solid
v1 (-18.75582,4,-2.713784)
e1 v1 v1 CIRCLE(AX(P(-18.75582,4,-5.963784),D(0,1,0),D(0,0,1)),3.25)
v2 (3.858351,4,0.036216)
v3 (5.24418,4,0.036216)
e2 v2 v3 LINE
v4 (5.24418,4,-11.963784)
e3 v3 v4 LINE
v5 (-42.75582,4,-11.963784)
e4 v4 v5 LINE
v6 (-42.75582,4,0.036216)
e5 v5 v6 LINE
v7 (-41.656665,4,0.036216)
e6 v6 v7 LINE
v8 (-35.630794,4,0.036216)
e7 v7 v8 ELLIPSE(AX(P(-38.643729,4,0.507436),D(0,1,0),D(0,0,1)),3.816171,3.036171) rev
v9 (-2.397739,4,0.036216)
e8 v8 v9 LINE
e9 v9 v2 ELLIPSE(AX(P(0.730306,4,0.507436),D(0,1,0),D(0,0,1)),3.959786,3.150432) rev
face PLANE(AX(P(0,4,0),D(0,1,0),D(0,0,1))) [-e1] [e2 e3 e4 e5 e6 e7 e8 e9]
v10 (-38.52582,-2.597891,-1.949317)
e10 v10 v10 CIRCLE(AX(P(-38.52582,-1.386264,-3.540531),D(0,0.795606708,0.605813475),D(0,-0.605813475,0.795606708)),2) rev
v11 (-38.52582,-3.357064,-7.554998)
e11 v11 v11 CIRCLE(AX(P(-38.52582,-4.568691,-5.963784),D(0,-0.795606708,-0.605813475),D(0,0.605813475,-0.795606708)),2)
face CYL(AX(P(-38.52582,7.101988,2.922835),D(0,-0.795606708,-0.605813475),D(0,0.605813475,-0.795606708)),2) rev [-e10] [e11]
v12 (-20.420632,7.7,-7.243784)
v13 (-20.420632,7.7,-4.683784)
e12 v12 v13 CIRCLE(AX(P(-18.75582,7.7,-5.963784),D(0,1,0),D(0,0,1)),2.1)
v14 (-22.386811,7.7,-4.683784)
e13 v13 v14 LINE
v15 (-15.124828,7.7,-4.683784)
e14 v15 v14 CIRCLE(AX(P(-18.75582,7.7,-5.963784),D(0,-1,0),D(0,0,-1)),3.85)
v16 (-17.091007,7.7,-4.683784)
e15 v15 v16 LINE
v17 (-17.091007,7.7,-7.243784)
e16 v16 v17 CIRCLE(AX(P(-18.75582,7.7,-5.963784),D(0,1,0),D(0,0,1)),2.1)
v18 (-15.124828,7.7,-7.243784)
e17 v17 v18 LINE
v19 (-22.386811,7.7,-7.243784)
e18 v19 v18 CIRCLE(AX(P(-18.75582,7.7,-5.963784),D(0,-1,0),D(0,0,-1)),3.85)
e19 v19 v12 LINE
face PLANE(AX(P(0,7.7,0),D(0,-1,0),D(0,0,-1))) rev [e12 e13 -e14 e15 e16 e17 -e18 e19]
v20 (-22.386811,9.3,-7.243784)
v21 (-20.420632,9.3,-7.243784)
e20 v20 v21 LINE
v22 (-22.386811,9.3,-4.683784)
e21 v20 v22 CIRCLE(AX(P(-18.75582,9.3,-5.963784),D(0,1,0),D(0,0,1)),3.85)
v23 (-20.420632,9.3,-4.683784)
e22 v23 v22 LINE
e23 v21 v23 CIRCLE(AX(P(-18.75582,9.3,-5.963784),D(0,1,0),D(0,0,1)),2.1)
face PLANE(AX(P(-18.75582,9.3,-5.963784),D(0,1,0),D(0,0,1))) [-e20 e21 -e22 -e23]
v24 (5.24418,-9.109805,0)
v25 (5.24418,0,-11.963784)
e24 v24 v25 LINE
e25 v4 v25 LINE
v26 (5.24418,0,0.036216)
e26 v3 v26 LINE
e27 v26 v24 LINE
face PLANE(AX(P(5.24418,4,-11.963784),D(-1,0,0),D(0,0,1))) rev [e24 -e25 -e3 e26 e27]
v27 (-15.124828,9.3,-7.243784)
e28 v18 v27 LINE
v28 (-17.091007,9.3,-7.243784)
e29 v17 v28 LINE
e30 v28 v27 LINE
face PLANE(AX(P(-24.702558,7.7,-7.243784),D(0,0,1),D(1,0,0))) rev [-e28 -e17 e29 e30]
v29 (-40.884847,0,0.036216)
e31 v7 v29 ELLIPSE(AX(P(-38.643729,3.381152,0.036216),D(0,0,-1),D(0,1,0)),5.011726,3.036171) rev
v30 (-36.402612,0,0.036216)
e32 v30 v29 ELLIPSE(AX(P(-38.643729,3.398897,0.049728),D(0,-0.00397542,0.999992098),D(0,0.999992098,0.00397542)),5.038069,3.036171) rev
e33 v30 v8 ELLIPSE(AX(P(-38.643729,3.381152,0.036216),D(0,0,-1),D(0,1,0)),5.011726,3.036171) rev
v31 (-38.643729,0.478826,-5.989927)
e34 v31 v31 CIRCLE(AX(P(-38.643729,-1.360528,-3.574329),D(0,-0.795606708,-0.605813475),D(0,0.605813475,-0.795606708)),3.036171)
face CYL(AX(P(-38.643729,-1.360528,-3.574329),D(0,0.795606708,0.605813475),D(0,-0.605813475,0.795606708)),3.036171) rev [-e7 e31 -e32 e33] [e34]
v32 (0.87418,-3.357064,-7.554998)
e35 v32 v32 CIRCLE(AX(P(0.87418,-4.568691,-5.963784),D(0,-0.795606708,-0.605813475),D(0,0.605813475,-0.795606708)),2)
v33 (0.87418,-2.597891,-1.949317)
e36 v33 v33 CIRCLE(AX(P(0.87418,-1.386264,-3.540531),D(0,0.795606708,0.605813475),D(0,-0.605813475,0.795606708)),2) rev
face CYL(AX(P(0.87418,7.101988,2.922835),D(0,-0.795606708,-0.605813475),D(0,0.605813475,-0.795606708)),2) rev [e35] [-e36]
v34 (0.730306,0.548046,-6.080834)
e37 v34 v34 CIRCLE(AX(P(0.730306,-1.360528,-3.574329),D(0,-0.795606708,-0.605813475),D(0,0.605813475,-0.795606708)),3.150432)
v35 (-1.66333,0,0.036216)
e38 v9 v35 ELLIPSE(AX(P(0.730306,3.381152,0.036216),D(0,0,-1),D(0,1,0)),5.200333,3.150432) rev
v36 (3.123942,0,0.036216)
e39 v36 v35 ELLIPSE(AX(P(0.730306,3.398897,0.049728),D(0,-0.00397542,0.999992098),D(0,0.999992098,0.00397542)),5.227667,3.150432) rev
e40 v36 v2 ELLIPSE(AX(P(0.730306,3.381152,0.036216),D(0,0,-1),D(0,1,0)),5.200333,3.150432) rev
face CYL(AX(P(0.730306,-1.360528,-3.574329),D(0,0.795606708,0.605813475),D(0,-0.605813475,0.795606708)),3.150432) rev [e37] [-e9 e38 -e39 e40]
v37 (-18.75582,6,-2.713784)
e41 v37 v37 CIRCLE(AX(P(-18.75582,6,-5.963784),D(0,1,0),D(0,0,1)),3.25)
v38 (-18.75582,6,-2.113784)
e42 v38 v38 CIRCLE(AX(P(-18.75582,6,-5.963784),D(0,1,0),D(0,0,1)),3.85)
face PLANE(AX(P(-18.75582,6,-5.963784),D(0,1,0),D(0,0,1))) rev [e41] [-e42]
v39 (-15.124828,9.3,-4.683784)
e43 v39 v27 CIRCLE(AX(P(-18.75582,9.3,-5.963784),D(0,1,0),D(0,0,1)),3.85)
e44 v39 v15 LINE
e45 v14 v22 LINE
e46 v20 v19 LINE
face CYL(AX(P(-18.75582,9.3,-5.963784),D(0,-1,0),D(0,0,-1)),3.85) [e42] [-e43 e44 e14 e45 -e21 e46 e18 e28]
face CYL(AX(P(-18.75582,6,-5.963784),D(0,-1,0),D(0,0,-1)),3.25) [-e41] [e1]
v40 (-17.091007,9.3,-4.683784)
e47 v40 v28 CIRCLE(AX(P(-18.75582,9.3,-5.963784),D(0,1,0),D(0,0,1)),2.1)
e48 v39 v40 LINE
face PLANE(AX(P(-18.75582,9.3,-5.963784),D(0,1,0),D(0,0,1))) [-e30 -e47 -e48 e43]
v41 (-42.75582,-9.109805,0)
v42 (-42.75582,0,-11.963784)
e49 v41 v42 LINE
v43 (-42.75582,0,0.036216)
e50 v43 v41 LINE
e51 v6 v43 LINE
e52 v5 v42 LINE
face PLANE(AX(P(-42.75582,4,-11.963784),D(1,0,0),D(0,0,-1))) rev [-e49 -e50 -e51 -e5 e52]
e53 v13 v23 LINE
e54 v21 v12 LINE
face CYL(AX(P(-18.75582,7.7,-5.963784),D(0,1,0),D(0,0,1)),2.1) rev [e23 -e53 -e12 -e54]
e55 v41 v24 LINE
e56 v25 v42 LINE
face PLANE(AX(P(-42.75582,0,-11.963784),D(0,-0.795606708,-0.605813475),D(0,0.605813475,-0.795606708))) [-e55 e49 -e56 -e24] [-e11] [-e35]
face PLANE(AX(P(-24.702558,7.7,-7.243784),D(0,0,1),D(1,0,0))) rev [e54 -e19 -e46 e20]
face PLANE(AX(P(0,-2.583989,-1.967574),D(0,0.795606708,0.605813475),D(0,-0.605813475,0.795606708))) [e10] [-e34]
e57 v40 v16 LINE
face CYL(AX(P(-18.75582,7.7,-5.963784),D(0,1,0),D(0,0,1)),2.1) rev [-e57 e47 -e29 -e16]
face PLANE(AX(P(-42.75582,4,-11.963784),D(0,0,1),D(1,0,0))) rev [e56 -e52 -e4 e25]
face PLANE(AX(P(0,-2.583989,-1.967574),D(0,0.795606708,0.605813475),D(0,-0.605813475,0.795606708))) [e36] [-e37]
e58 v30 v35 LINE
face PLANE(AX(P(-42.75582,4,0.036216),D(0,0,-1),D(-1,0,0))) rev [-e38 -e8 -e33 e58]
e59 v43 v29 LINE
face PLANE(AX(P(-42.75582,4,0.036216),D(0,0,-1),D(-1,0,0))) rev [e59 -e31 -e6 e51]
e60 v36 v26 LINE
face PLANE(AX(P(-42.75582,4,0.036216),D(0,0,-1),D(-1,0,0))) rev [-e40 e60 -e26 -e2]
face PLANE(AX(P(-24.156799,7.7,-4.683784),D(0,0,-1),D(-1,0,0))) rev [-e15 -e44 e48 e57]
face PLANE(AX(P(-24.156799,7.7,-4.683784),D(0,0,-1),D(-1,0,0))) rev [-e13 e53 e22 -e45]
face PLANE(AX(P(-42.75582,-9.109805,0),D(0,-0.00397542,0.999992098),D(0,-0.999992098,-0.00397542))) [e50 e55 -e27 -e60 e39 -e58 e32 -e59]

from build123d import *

# Parameters (mm, degrees)
SKETCH1_W                 = 48
SKETCH1_H                 = 12
BOSS_EXTRUDE2_DEPTH       = 4
SKETCH3_R                 = 3.25
BOSS_EXTRUDE3_DEPTH       = 2
SKETCH4_R                 = 3.85
BOSS_EXTRUDE4_DEPTH       = 3.3
SKETCH5_W                 = 10.744623103
SKETCH5_H                 = 3.104002229
SKETCH5_W_2               = 12.040799858
SKETCH5_H_2               = 4.707168217
CUT_EXTRUDE6_DEPTH        = 1.6
SKETCH6_R                 = 2.1
CUT_EXTRUDE7_DEPTH        = 1.6
BOSS_EXTRUDE5_DEPTH       = 48
SKETCH11_R                = 2
CUT_EXTRUDE12_DEPTH       = 46.960925441
CUT_EXTRUDE13_START       = -3.247821806
CUT_EXTRUDE13_OUTLINE_R   = 3.036171251
CUT_EXTRUDE13_OUTLINE_R_2 = 2
CUT_EXTRUDE13_OUTLINE_R_3 = 3.150431912
CUT_EXTRUDE13_DEPTH       = 6.452188627


# Read off the part's stored shape, not the designer's step: Cut-Extrude13
with BuildPart() as part:
    # Sketch1 → Boss-Extrude2 (new body)
    with BuildSketch(Plane(origin=(0, 0, 0), x_dir=(1, 0, 0), z_dir=(0, 1, 0))):
        with Locations((-18.755819717, 5.963784416)):
            Rectangle(SKETCH1_W, SKETCH1_H)
    extrude(amount=BOSS_EXTRUDE2_DEPTH)

    # Sketch3 → Boss-Extrude3 (add)
    with BuildSketch(Plane(origin=(0, 4, 0), x_dir=(1, 0, 0), z_dir=(0, 1, 0))):
        with Locations(Location((-18.755819717, 5.963784416, 0), (0, 0, 270))):
            Circle(SKETCH3_R)
    extrude(amount=BOSS_EXTRUDE3_DEPTH)

    # Sketch4 → Boss-Extrude4 (add)
    with BuildSketch(Plane(origin=(0, 6, 0), x_dir=(1, 0, 0), z_dir=(0, 1, 0))):
        with Locations(Location((-18.755819717, 5.963784416, 0), (0, 0, 270))):
            Circle(SKETCH4_R)
    extrude(amount=BOSS_EXTRUDE4_DEPTH)

    # Sketch5 → Cut-Extrude6 (cut)
    with BuildSketch(Plane(origin=(0, 9.3, 0), x_dir=(1, 0, 0), z_dir=(0, 1, 0))):
        with Locations((-18.784487645, 3.131783302)):
            Rectangle(SKETCH5_W, SKETCH5_H)
        with Locations((-18.682157901, 9.597368525)):
            Rectangle(SKETCH5_W_2, SKETCH5_H_2)
    extrude(amount=-CUT_EXTRUDE6_DEPTH, mode=Mode.SUBTRACT)

    # Sketch6 → Cut-Extrude7 (cut)
    with BuildSketch(Plane(origin=(0, 9.3, 0), x_dir=(1, 0, 0), z_dir=(0, 1, 0))):
        with Locations((-18.755819717, 5.963784416)):
            Circle(SKETCH6_R)
    extrude(amount=-CUT_EXTRUDE7_DEPTH, mode=Mode.SUBTRACT)

    # Sketch7 → Boss-Extrude5 (add)
    with BuildSketch(Plane(origin=(5.244180283, 0, 0), x_dir=(0, 0, -1), z_dir=(1, 0, 0))):
        Polygon((11.963784416, 0), (0, -9.109804798), (-0.036215584, 0), align=None)
    extrude(amount=-BOSS_EXTRUDE5_DEPTH)

    # Sketch11 → Cut-Extrude12 (cut, through all)
    with BuildSketch(Plane(origin=(0, -5.766415649, -4.390828112), x_dir=(1, 0, 0), z_dir=(0, -0.7956067081089262, -0.6058134746042532))):
        with Locations(Location((0.874180283, -1.977052592, 0), (0, 0, 270))):
            Circle(SKETCH11_R)
        with Locations(Location((-38.525819717, -1.977052592, 0), (0, 0, 270))):
            Circle(SKETCH11_R)
    extrude(amount=-CUT_EXTRUDE12_DEPTH, mode=Mode.SUBTRACT)

    # Cut-Extrude13 outline → Cut-Extrude13 (cut)
    # profile 1 of 2: a face of its own
    with BuildSketch(Plane(origin=(0, 0, 0), x_dir=(1, 0, 0), z_dir=(0, 0.7956067081089261, 0.6058134746042532)).offset(CUT_EXTRUDE13_START)):
        with Locations((-38.643729383, 2.019534021)):
            Circle(CUT_EXTRUDE13_OUTLINE_R)
        with Locations((-38.525819717, 1.977052592)):
            Circle(CUT_EXTRUDE13_OUTLINE_R_2, mode=Mode.SUBTRACT)
    # profile 2 of 2: a face of its own
    with BuildSketch(Plane(origin=(0, 0, 0), x_dir=(1, 0, 0), z_dir=(0, 0.7956067081089261, 0.6058134746042532)).offset(CUT_EXTRUDE13_START)):
        with Locations((0.730306236, 2.019534021)):
            Circle(CUT_EXTRUDE13_OUTLINE_R_3)
        with Locations((0.874180283, 1.977052592)):
            Circle(CUT_EXTRUDE13_OUTLINE_R_2, mode=Mode.SUBTRACT)
    extrude(amount=CUT_EXTRUDE13_DEPTH, mode=Mode.SUBTRACT)


solid = part.part
